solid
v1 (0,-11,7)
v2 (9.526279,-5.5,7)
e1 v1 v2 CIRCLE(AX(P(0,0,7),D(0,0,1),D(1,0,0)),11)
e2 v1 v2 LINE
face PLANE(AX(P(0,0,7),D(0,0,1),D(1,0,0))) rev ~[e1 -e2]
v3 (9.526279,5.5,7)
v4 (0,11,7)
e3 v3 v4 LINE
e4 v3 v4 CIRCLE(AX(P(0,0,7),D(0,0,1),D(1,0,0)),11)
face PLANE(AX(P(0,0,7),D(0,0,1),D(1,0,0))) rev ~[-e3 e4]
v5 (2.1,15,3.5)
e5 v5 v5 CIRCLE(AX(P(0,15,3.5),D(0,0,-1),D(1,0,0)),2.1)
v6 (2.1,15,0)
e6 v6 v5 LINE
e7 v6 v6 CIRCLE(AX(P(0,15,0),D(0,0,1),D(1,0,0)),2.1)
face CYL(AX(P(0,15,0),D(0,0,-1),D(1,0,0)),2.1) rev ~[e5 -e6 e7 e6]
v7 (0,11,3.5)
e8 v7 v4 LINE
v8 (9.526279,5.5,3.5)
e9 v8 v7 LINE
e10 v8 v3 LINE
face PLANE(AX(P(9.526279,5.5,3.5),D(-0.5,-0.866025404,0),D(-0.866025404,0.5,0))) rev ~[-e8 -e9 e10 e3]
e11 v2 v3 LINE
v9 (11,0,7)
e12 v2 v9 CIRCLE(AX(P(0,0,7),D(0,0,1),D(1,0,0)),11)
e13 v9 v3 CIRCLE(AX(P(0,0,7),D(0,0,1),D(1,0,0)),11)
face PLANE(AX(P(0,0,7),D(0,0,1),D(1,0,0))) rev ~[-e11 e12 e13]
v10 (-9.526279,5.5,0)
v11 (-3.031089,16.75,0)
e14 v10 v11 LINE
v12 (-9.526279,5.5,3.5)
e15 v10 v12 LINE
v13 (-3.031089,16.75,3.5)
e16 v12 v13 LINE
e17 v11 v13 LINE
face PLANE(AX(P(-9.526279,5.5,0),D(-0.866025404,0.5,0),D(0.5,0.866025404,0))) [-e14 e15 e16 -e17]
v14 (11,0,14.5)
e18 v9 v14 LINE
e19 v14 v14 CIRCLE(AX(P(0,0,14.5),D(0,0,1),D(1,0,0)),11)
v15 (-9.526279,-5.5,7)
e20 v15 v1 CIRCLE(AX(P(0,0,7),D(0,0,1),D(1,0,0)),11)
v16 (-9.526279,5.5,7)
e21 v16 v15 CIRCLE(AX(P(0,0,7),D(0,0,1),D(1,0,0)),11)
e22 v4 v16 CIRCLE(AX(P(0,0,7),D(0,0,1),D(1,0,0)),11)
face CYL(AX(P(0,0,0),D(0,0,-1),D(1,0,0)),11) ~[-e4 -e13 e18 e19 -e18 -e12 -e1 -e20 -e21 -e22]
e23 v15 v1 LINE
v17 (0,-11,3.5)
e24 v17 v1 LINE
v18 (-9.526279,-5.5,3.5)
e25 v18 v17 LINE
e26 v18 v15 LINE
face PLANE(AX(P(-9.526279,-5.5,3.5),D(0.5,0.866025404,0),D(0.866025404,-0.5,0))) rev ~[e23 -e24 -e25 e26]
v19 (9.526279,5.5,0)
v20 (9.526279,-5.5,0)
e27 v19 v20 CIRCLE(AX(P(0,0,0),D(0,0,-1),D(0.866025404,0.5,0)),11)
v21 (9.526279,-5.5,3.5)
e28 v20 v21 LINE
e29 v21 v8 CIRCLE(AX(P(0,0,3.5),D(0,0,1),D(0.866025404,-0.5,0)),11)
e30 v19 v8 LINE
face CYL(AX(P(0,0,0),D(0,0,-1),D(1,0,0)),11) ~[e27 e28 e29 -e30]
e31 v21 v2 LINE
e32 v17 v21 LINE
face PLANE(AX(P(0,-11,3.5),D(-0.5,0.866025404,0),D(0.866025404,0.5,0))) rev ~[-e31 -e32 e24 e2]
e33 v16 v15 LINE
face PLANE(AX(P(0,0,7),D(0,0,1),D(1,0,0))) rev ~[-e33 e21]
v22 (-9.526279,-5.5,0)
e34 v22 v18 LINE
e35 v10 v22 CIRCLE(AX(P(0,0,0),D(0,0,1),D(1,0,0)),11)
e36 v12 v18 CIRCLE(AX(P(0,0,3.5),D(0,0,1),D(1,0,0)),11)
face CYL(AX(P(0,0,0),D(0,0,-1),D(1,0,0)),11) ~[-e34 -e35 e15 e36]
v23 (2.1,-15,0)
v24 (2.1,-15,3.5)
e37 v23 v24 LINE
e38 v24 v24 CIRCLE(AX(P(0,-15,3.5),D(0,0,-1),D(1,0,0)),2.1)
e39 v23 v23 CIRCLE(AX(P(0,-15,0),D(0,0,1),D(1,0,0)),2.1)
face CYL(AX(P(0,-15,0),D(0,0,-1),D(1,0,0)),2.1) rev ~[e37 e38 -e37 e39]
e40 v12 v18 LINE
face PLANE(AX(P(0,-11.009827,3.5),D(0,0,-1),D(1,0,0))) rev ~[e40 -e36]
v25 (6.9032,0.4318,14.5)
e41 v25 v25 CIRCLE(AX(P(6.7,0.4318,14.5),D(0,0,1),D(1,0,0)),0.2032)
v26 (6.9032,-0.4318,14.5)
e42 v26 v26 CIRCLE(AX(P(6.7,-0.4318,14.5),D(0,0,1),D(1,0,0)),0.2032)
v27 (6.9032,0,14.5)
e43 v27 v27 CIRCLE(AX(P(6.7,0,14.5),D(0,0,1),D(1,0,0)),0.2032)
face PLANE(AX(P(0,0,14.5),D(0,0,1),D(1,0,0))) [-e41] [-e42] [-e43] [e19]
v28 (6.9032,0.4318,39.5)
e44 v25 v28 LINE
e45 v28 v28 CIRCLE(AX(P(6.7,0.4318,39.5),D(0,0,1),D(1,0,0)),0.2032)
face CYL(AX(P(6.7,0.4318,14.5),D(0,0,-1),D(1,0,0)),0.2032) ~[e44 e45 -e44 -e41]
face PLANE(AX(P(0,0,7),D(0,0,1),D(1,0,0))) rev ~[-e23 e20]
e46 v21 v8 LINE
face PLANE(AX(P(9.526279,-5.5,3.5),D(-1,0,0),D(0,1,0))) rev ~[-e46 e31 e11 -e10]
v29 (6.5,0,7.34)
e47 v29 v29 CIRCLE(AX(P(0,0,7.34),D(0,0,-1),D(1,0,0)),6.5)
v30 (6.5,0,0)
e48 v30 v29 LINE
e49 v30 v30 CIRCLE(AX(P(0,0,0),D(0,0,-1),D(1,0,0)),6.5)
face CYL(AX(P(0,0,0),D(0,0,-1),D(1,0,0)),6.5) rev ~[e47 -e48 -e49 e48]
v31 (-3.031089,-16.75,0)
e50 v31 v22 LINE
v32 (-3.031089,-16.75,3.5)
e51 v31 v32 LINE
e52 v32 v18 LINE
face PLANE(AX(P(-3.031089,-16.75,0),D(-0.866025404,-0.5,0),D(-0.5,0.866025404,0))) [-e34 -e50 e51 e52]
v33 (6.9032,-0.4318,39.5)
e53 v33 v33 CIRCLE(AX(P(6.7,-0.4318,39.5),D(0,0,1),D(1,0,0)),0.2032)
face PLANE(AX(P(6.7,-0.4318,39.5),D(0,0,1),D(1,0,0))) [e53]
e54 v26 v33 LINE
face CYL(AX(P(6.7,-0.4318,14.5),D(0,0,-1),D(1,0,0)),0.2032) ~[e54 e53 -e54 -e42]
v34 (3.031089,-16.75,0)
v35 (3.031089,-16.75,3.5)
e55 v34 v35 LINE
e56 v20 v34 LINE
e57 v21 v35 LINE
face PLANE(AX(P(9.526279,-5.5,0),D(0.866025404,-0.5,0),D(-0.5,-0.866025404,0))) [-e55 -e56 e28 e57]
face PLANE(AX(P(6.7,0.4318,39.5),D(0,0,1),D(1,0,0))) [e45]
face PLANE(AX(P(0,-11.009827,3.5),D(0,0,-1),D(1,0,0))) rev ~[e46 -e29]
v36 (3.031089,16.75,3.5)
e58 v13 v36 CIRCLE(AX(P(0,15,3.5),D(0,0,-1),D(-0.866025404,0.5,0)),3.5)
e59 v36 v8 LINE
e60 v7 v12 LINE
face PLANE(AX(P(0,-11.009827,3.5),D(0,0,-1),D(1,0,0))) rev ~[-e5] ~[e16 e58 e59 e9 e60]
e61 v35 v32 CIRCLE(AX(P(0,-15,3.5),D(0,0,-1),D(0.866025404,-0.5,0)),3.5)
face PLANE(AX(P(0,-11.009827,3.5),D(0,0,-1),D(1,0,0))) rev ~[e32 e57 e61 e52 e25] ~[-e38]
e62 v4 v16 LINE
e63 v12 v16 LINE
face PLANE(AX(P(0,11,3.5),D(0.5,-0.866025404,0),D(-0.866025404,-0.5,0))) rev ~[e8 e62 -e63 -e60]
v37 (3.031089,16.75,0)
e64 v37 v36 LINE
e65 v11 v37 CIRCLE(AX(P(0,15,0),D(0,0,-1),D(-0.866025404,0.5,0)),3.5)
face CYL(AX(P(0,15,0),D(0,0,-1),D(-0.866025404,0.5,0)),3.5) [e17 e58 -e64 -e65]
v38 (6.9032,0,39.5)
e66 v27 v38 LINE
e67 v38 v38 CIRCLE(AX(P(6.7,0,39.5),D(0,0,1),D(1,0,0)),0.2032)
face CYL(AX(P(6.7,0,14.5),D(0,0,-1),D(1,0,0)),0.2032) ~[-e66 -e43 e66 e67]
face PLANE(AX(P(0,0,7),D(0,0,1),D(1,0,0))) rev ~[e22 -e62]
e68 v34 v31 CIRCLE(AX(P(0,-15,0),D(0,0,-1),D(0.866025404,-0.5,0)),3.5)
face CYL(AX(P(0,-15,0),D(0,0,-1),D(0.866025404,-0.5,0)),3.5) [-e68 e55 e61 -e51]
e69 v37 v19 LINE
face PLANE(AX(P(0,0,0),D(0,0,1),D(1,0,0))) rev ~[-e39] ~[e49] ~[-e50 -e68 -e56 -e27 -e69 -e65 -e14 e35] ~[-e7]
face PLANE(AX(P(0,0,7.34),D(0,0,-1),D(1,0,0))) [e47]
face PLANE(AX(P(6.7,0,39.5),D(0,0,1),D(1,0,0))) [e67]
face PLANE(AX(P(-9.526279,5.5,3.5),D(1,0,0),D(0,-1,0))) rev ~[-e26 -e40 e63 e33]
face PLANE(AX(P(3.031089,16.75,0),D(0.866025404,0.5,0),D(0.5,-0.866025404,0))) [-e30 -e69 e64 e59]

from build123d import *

# Parameters (mm, degrees)
F0_R      = 11
F1_DEPTH  = 14.5
F2_R      = 2.1
F3_DEPTH  = 3.5
F4_R      = 11
F5_DEPTH  = 3.5
F7_DEPTH  = 3.5
F8_R      = 6.5
F9_DEPTH  = 7.34
F10_R     = 0.2032
F11_DEPTH = 25


# Not quite as in the source:
# - a pattern or mirror of a feature is missing from the dataset's text; its kind, count and spacing are read off the source's solid


with BuildPart() as f1:
    # F0 (on Top) → F1 (new body)
    with BuildSketch(Plane.XY):
        Circle(F0_R)
    extrude(amount=F1_DEPTH)

    # F2 (on face) → F3 (join)
    with BuildSketch(Plane(origin=(0, 0, 0), x_dir=(1, 0, 0), z_dir=(0, 0, -1))):
        with BuildLine():
            Line((9.5262794416, 5.5), (3.0310889132, 16.75))
            ThreePointArc((3.0310889132, 16.75), (0, 18.5), (-3.0310889132, 16.75))
            Line((-3.0310889132, 16.75), (-9.5262794416, 5.5))
            ThreePointArc((-9.5262794416, 5.5), (0, 11), (9.5262794416, 5.5))
        make_face()
        with Locations((0, 15)):
            Circle(F2_R, mode=Mode.SUBTRACT)
        with BuildLine():
            ThreePointArc((9.5262794416, -5.5), (0, -11), (-9.5262794416, -5.5))
            Line((-9.5262794416, -5.5), (-3.0310889132, -16.75))
            ThreePointArc((-3.0310889132, -16.75), (0, -18.5), (3.0310889132, -16.75))
            Line((3.0310889132, -16.75), (9.5262794416, -5.5))
        make_face()
        with Locations((0, -15)):
            Circle(F2_R, mode=Mode.SUBTRACT)
    f3 = extrude(amount=-F3_DEPTH)

    # F3_copies: F3 across plane
    add(f3.mirror(Plane(origin=(0, 0, 0), x_dir=(0, 0, -1), z_dir=(-1, 0, 0))))

    # F4 (on face) → F5 (cut)
    with BuildSketch(Plane.XY.offset(3.5)):
        Circle(F4_R)
    extrude(amount=F5_DEPTH, mode=Mode.SUBTRACT)

    # F6 (on face) → F7 (join)
    with BuildSketch(Plane.XY.offset(3.5)):
        Polygon((9.5262794416, 5.5), (0, 11), (-9.5262794416, 5.5), (-9.5262794416, -5.5), (0, -11), (9.5262794416, -5.5), align=None)
    extrude(amount=F7_DEPTH)

    # F8 (on face) → F9 (cut)
    with BuildSketch(Plane(origin=(0, 0, 0), x_dir=(1, 0, 0), z_dir=(0, 0, -1))):
        Circle(F8_R)
    extrude(amount=-F9_DEPTH, mode=Mode.SUBTRACT)

    # F10 (on face) → F11 (join)
    with BuildSketch(Plane.XY.offset(14.5)):
        with Locations((6.7, 0)):
            Circle(F10_R)
        with Locations((6.7, 0.4318)):
            Circle(F10_R)
        with Locations((6.7, -0.4318)):
            Circle(F10_R)
    extrude(amount=F11_DEPTH)


solid = f1.part
